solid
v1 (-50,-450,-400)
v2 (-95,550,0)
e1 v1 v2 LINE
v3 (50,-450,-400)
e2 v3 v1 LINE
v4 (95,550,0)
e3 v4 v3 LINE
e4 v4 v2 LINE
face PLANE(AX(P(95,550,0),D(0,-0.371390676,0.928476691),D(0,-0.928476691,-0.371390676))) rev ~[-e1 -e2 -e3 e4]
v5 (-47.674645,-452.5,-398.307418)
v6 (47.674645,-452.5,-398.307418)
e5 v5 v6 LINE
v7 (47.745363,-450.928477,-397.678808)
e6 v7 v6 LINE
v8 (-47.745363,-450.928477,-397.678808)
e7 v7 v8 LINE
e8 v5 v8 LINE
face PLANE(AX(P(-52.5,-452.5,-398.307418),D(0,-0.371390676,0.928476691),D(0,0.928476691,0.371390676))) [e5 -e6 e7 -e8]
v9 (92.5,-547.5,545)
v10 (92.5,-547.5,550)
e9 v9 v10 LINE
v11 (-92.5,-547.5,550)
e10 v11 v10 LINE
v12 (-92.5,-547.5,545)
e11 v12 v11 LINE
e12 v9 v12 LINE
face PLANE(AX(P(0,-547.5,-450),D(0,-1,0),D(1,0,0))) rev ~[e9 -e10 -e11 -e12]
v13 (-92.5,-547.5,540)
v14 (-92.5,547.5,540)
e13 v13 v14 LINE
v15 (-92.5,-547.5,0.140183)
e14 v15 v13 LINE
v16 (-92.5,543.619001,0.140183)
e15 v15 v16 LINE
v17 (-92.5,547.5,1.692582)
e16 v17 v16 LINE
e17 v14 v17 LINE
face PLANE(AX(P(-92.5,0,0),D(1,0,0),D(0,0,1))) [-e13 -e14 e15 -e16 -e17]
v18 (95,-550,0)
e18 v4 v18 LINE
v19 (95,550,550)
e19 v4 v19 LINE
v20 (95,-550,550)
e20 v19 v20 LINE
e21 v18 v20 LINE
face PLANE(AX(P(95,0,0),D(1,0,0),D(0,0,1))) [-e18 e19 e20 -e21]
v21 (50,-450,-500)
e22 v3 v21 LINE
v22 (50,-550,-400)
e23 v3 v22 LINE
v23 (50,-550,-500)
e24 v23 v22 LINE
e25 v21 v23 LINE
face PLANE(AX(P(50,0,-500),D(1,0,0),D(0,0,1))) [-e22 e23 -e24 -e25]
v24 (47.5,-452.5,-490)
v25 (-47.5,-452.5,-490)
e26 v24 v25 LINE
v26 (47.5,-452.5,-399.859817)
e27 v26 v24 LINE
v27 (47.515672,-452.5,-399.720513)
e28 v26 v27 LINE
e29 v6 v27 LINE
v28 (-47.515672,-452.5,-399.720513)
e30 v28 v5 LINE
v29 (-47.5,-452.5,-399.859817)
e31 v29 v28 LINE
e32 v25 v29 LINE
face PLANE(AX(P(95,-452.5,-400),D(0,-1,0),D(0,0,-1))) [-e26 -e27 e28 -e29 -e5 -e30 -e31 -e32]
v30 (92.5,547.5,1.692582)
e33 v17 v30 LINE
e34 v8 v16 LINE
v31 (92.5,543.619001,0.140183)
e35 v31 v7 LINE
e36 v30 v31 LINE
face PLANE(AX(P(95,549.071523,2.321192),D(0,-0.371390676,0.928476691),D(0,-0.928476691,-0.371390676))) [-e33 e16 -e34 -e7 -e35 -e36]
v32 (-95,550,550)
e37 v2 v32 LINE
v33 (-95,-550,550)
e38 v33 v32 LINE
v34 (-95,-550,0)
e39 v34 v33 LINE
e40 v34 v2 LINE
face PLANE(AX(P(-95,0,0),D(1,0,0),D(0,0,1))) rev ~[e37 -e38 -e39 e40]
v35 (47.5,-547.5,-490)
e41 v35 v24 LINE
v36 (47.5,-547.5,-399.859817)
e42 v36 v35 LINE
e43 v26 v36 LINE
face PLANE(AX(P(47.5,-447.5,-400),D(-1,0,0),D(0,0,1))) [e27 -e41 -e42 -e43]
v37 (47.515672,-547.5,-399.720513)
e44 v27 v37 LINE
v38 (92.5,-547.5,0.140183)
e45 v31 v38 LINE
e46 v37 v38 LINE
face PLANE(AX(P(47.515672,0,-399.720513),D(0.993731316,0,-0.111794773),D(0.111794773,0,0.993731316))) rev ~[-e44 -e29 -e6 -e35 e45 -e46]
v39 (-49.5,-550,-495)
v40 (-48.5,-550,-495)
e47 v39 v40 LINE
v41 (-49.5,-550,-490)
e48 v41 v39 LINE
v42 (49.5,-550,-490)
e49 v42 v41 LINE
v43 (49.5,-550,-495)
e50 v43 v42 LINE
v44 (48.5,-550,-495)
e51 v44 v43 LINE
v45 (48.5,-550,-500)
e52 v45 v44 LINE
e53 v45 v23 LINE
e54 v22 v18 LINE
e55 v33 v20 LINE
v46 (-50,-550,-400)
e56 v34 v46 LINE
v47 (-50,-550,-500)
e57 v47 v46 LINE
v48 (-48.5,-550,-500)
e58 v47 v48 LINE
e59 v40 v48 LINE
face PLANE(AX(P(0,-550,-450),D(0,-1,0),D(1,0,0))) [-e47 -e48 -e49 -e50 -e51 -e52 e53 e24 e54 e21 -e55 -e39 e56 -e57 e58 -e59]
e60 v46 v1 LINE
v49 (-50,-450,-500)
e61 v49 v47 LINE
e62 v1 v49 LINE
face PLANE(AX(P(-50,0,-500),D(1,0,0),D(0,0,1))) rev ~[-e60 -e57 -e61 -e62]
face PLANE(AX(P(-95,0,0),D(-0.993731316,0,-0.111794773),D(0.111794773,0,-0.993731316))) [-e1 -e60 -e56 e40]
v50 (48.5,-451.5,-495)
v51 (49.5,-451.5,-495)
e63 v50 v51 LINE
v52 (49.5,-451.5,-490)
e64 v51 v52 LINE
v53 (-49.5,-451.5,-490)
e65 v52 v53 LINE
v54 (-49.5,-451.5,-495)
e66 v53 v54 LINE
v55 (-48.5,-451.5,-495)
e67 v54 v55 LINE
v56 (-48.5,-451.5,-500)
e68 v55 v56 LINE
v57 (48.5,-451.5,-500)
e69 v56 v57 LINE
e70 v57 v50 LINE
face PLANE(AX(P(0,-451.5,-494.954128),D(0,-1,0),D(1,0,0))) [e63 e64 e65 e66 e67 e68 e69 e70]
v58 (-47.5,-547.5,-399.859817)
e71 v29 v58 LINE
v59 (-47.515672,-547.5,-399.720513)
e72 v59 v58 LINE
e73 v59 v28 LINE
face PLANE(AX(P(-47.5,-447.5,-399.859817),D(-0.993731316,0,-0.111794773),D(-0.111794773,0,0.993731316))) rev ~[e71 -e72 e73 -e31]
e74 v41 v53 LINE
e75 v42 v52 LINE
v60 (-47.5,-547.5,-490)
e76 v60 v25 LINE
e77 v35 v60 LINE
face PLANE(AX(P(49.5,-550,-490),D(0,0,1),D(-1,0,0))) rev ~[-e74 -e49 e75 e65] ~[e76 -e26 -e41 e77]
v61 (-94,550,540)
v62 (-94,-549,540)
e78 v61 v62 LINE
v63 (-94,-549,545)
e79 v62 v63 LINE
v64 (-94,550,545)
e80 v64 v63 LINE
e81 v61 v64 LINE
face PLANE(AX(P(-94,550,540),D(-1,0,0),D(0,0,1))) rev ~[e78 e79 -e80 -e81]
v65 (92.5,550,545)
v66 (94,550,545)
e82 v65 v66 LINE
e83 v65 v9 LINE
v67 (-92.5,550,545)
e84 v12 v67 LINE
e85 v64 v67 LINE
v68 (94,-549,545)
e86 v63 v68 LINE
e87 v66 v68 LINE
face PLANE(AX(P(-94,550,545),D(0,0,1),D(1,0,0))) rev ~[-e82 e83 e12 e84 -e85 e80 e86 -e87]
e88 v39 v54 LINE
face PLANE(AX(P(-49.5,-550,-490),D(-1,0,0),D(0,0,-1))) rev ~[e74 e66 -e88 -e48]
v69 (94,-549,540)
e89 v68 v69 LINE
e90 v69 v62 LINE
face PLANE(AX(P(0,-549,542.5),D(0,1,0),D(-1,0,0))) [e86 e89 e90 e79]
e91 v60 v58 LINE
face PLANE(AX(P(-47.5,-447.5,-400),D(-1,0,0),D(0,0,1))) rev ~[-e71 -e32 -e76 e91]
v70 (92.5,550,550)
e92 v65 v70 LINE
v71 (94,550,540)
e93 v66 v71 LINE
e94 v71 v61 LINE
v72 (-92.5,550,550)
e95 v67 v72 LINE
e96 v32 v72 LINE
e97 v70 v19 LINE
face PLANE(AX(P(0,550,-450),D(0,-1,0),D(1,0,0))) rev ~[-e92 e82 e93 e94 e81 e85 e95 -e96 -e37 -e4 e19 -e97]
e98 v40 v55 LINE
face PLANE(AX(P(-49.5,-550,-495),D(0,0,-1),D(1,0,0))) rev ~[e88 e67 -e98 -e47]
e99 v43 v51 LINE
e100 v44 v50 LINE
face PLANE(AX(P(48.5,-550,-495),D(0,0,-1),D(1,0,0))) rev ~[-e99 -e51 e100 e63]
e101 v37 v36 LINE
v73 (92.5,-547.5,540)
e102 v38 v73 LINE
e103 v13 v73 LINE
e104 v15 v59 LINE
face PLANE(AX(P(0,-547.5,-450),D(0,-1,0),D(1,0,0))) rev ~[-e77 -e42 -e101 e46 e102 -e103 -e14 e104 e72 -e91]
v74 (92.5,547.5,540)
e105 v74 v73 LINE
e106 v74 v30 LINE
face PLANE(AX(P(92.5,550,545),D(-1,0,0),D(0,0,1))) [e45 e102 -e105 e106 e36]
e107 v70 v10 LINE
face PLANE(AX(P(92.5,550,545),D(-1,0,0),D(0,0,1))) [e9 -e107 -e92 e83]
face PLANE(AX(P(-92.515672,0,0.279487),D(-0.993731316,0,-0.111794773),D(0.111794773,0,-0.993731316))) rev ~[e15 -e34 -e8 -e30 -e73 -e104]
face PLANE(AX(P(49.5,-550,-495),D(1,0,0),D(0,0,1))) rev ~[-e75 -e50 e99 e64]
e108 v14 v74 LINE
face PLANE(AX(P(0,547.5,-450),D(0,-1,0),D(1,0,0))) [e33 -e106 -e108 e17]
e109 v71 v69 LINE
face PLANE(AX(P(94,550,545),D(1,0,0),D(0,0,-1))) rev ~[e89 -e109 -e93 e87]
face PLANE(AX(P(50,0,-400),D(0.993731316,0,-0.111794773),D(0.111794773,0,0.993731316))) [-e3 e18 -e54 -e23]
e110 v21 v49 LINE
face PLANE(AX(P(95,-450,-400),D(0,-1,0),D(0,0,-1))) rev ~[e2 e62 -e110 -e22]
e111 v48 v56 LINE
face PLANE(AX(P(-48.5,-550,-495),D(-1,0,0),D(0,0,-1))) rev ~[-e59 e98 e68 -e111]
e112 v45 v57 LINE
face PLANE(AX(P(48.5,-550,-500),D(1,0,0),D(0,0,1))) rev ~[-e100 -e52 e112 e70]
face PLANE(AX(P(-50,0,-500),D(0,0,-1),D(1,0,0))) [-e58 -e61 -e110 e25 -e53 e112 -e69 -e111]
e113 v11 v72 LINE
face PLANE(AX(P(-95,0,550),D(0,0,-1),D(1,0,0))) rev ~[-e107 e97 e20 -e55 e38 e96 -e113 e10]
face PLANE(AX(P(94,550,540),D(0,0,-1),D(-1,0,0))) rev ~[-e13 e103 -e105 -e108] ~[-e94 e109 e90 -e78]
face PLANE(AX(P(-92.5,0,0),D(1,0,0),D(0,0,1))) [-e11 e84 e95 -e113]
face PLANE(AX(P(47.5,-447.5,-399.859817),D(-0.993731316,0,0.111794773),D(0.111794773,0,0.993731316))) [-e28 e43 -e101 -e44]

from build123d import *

# Parameters (mm, degrees)
F0_W        = 100
F0_H        = 100
F0_W_2      = 190
F0_H_2      = 550
F1_DEPTH    = 550
F3_DEPTH    = 190
F4_T        = 2.5
F4_T3_DEPTH = 105
F4_T5_DEPTH = 105
F6_DEPTH    = 98.5
F7_W        = 185
F7_H        = 5
F8_DEPTH    = 2.5
F9_DEPTH    = 1099


# Not quite as in the source:
# - a shell that OpenCascade refuses in one call is made with other operations: the cavity is built on its own and cut out


with BuildPart() as f1:
    # F0 (on Front) → F1 (new body, symmetric)
    with BuildSketch(Plane.XZ):
        with Locations((0, -450)):
            Rectangle(F0_W, F0_H)
        with Locations((0, 275)):
            Rectangle(F0_W_2, F0_H_2)
        Polygon((50, -400), (95, 0), (-95, 0), (-50, -400), align=None)
    extrude(amount=F1_DEPTH, both=True)

    # F2 (on face) → F3 (cut)
    with BuildSketch(Plane.YZ.offset(95)):
        Polygon((550, -500), (550, 0), (-450, -400), (-450, -500), align=None)
    extrude(amount=-F3_DEPTH, mode=Mode.SUBTRACT)

    # F4: shell of thickness 2.5, made by hand


with BuildPart() as f4_core1:
    # F4_t2: copy of F1
    add(f1.part)

    # the walls: a layer under each face that stays
    f4_faces = [f4_core1.faces().sort_by_distance(p)[0] for p in [
        (50, -500, -450),
        (0, -550, 25),
        (72.5, 0, -200),
        (0, -450, -450),
        (-50, -500, -450),
        (95, 0, 275),
        (-95, 0, 275),
        (-72.5, 0, -200),
        (0, 50, -200),
        (0, 550, 275),
    ]]
    thicken(f4_faces, amount=-F4_T, mode=Mode.SUBTRACT)

    # F4_s4 → F4_t3 (cut)
    with BuildSketch(Plane.XZ.offset(447.5)):
        Polygon((50.0498432829, -400.0027948693), (47.5, -400), (47.5, -399.8598171527), (47.5156717096, -399.7205130673), align=None)
        Polygon((-50.0498432829, -400.0027948693), (-47.5, -400), (-47.5, -399.8598171527), (-47.5156717096, -399.7205130673), align=None)
    extrude(amount=F4_T3_DEPTH, mode=Mode.SUBTRACT)

    # F4_s6 → F4_t5 (cut)
    with BuildSketch(Plane.YZ.offset(-52.5)):
        Polygon((-449.9657152331, -400.0232119173), (-452.5, -400), (-452.5, -398.3074175964), (-450.9284766909, -397.6788082728), align=None)
    extrude(amount=F4_T5_DEPTH, mode=Mode.SUBTRACT)


with BuildPart() as f1_1:
    add(f1.part)

    # what is left inside the walls is the cavity
    f4_cavity = [f4_core1.part.solids().sort_by_distance(p)[0] for p in [
        (-92.475, 182.5, 275.070091),
    ]]
    add(f4_cavity, mode=Mode.SUBTRACT)

    # F5 (on face) → F6 (cut)
    with BuildSketch(Plane.XZ.offset(550)):
        Polygon((-48.5, -495), (-48.5, -500), (48.5, -500), (48.5, -495), (49.5, -495), (49.5, -490), (-49.5, -490), (-49.5, -495), align=None)
    extrude(amount=-F6_DEPTH, mode=Mode.SUBTRACT)

    # F7 (on face) → F8 (cut)
    with BuildSketch(Plane(origin=(0, 550, 0), x_dir=(-1, 0, 0), z_dir=(0, 1, 0))):
        with Locations((0, 547.5)):
            Rectangle(F7_W, F7_H)
    extrude(amount=-F8_DEPTH, mode=Mode.SUBTRACT)

    # F7 (on face) → F9 (cut)
    with BuildSketch(Plane(origin=(0, 550, 0), x_dir=(-1, 0, 0), z_dir=(0, 1, 0))):
        Polygon((92.5, 545), (-92.5, 545), (-94, 545), (-94, 540), (94, 540), (94, 545), align=None)
    extrude(amount=-F9_DEPTH, mode=Mode.SUBTRACT)


solid = f1_1.part
